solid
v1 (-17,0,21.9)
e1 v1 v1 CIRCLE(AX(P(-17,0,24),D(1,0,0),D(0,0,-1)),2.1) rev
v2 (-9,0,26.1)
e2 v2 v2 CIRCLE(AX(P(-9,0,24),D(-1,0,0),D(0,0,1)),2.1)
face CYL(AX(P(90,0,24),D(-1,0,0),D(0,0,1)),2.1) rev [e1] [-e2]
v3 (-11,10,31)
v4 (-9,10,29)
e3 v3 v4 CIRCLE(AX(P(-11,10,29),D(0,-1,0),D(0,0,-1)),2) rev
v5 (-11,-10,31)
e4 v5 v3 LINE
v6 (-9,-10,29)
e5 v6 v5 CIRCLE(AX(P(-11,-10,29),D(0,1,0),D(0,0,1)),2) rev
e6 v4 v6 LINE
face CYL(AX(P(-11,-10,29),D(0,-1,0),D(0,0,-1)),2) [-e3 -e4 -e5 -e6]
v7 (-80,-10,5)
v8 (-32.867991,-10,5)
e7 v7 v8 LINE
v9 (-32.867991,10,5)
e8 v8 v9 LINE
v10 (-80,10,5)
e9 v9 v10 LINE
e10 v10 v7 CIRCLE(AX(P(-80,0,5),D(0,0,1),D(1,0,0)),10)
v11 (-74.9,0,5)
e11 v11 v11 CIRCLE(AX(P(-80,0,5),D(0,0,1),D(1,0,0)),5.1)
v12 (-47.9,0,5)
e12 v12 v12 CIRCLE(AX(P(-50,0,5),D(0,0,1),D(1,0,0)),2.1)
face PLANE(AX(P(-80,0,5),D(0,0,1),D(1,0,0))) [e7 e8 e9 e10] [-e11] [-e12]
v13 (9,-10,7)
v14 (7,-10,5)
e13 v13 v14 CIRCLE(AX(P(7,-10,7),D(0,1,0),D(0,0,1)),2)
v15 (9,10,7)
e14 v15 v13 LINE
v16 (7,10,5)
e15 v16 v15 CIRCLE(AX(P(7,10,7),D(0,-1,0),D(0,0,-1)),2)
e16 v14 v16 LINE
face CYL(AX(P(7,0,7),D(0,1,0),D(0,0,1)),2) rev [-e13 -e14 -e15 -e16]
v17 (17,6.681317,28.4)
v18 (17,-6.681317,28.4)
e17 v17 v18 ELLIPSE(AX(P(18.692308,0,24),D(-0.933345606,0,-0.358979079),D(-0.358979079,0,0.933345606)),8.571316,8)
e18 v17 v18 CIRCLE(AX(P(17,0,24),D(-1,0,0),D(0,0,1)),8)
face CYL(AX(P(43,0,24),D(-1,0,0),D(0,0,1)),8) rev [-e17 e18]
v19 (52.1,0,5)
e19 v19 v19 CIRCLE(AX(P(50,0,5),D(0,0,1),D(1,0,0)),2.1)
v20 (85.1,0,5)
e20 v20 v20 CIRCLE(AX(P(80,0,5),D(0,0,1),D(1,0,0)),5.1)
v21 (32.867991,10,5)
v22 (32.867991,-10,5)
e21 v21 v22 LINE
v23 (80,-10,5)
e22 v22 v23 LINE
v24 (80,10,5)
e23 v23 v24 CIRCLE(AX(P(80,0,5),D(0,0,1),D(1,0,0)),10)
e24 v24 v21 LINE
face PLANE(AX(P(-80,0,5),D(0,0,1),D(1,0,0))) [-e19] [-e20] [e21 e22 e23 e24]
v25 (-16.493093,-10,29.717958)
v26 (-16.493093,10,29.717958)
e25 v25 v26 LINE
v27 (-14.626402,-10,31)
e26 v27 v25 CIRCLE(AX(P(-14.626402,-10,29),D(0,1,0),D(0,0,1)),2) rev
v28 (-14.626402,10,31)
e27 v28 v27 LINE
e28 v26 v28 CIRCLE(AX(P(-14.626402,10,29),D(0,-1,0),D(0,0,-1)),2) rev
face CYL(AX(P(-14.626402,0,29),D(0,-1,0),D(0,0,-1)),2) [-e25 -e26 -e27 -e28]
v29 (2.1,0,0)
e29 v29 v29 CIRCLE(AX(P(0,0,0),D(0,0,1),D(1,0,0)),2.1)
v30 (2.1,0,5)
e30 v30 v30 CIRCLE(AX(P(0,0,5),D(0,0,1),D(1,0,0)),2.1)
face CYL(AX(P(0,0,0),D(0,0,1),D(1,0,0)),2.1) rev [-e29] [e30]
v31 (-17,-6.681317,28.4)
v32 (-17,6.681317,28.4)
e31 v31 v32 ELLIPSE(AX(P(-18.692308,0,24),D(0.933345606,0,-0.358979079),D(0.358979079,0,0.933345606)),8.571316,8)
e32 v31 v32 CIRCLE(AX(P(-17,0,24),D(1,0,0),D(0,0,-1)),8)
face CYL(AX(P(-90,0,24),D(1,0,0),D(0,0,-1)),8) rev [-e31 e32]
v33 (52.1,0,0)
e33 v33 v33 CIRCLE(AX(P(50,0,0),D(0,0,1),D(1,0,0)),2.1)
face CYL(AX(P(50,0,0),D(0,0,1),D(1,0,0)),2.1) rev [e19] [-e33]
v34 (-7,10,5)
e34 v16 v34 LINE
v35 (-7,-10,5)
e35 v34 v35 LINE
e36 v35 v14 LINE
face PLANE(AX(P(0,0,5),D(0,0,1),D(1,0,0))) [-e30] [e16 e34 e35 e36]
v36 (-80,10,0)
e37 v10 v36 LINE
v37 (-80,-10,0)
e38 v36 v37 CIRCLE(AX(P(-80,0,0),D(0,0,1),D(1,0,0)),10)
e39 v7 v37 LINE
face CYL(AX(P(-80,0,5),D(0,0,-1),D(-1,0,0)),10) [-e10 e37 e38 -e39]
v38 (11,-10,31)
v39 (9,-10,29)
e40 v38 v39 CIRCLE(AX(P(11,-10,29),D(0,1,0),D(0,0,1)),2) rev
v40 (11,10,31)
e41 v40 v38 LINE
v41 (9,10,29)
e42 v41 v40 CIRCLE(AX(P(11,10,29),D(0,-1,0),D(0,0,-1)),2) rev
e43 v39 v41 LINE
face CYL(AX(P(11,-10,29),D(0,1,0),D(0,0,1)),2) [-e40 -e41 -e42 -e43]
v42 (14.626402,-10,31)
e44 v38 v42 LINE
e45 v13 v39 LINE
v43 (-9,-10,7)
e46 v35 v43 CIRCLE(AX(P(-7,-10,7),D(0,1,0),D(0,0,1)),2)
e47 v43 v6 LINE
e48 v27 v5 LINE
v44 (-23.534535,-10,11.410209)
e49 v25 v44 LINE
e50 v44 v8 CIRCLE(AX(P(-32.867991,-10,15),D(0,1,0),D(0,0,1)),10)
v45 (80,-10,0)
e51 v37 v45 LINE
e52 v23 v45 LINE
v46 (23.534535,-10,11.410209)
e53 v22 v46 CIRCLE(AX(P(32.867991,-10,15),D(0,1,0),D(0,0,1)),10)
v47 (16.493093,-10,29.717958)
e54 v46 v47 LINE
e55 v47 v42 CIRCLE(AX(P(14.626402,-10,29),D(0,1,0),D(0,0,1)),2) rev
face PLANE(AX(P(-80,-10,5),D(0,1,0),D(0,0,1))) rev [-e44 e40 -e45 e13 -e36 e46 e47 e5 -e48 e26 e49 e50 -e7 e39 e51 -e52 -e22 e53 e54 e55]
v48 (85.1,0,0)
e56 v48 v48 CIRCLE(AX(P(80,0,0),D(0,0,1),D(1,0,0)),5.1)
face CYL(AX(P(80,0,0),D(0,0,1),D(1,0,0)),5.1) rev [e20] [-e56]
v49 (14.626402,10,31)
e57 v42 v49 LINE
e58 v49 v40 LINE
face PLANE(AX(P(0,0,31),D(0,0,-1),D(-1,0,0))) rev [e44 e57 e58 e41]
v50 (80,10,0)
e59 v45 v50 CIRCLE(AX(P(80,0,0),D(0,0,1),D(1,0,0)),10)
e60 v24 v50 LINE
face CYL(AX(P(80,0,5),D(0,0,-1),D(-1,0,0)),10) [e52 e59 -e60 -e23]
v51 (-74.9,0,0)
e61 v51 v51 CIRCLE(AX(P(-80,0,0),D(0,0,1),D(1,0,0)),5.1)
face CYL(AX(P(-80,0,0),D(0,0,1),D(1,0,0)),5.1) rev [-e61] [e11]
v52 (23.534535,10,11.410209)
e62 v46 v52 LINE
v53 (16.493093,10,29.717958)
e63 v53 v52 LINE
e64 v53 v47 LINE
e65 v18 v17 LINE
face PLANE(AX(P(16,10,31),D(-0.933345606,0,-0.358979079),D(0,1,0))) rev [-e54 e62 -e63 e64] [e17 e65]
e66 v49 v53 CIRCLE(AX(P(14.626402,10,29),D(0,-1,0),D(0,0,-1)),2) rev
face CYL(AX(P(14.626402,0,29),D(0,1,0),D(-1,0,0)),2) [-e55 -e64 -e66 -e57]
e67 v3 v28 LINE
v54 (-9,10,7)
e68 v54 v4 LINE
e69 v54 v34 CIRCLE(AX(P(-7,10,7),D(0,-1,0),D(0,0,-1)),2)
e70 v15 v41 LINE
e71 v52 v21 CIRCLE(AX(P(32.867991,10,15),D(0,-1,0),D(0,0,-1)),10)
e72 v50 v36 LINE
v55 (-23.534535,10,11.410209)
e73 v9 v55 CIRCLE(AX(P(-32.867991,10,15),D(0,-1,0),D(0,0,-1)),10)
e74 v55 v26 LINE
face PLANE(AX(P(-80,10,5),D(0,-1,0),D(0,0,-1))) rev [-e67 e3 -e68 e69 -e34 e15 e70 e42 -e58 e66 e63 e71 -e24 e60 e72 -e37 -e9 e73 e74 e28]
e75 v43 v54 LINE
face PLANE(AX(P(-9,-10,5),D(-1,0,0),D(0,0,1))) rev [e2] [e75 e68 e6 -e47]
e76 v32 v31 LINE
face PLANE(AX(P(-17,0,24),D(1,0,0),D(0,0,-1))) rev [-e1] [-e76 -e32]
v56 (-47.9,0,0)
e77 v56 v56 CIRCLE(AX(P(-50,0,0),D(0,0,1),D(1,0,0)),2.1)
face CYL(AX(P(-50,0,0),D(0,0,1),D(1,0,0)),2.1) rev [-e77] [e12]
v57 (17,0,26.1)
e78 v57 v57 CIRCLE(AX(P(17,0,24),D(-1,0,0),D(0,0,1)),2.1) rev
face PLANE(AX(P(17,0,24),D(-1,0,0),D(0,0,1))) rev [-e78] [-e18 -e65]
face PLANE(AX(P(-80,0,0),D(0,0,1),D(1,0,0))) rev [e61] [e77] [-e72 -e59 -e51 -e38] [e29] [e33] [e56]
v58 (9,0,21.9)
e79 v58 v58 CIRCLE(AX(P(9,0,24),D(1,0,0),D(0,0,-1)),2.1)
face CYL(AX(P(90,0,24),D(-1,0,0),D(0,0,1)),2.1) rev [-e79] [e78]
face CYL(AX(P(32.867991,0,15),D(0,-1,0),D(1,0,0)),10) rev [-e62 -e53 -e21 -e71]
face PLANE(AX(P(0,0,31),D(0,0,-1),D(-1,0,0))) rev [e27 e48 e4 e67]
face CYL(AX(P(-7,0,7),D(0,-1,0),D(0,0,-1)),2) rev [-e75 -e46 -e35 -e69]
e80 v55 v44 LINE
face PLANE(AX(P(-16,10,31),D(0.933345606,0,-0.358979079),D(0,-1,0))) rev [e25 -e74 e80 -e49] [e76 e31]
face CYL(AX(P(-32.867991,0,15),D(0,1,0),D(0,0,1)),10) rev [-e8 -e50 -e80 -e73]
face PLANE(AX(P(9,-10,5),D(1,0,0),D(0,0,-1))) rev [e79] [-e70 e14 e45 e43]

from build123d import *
from OCP.BRepFilletAPI import BRepFilletAPI_MakeChamfer

# Parameters (mm, degrees)
BOSS_EXTRU_1_DEPTH           = 5
ESQUISSE2_R                  = 5.1
ESQUISSE2_R_2                = 2.1
ENL_V_MAT_EXTRU_1_DEPTH      = 91.691785736
ESQUISSE3_W                  = 32
ESQUISSE3_H                  = 20
BOSS_EXTRU_2_DEPTH           = 26
CHANFREIN1_SIZE              = 10
CHANFREIN1_SIZE_2            = 26
CONG_1_R                     = 10
ESQUISSE4_W                  = 18
ESQUISSE4_H                  = 20
ENL_V_MAT_EXTRU_2_DEPTH      = 26
CONG_2_R                     = 2
ENL_V_MAT_EXTRU_3_DEPTH      = 105.220919205
ENL_V_MAT_EXTRU_3_DEPTH_BACK = 105.220919205
ESQUISSE5_R                  = 2.1
ENL_V_START                  = -8
ESQUISSE6_R                  = 8
ENL_V_MAT_EXTRU_4_DEPTH      = 26
ESQUISSE7_R                  = 8
ENL_V_MAT_EXTRU_5_DEPTH      = 97.220919205
CONG_3_START                 = -11
CONG_3_DEPTH                 = 22
SKETCH1_R                    = 2.1
CUT_EXTRUDE1_DEPTH           = 95.212525707


with BuildPart() as part:
    # Esquisse1 → Boss.-Extru.1 (new body)
    with BuildSketch(Plane.XY):
        with BuildLine():
            Line((-80, 10), (80, 10))
            ThreePointArc((80, 10), (90, 0), (80, -10))
            Line((80, -10), (-80, -10))
            ThreePointArc((-80, -10), (-90, 0), (-80, 10))
        make_face()
    extrude(amount=BOSS_EXTRU_1_DEPTH)

    # Esquisse2 → Enlèv. mat.-Extru.1 (cut, through all)
    with BuildSketch(Plane.XY.offset(5)):
        with Locations((-80, 0)):
            Circle(ESQUISSE2_R)
        with Locations((80, 0)):
            Circle(ESQUISSE2_R)
        with Locations((-50, 0)):
            Circle(ESQUISSE2_R_2)
        with Locations((50, 0)):
            Circle(ESQUISSE2_R_2)
    extrude(amount=-ENL_V_MAT_EXTRU_1_DEPTH, mode=Mode.SUBTRACT)

    # Esquisse3 → Boss.-Extru.2 (add)
    with BuildSketch(Plane.XY.offset(5)):
        Rectangle(ESQUISSE3_W, ESQUISSE3_H)
    extrude(amount=BOSS_EXTRU_2_DEPTH)

    # Chanfrein1
    chanfrein1_edges_1 = [part.edges().sort_by_distance(p)[0] for p in [
        (16, 0, 5),
    ]]
    chanfrein1_side_1 = [part.faces().sort_by_distance(p)[0] for p in [
        (16.2, 0, 5),
    ]]
    chanfrein1_edges_2 = [part.edges().sort_by_distance(p)[0] for p in [
        (-16, 0, 5),
    ]]
    chanfrein1_side_2 = [part.faces().sort_by_distance(p)[0] for p in [
        (-16.2, 0, 5),
    ]]
    chanfrein1 = BRepFilletAPI_MakeChamfer(part.part.solid().wrapped)
    for e in chanfrein1_edges_1:
        chanfrein1.Add(CHANFREIN1_SIZE - 0.0001, CHANFREIN1_SIZE_2 - 0.0001, e.wrapped, chanfrein1_side_1[0].wrapped)
    for e in chanfrein1_edges_2:
        chanfrein1.Add(CHANFREIN1_SIZE - 0.0001, CHANFREIN1_SIZE_2 - 0.0001, e.wrapped, chanfrein1_side_2[0].wrapped)
    add(Compound.cast(chanfrein1.Shape()), mode=Mode.REPLACE)  # a hair under: the kernel refuses the full size

    # Congé1
    cong_1_edges = [part.edges().sort_by_distance(p)[0] for p in [
        (25.9999, 0, 5),
        (-25.9999, 0, 5),
    ]]
    fillet(cong_1_edges, radius=CONG_1_R)

    # Esquisse4 → Enlèv. mat.-Extru.2 (cut)
    with BuildSketch(Plane.XY.offset(31)):
        Rectangle(ESQUISSE4_W, ESQUISSE4_H)
    extrude(amount=-ENL_V_MAT_EXTRU_2_DEPTH, mode=Mode.SUBTRACT)

    # Congé2
    cong_2_edges = [part.edges().sort_by_distance(p)[0] for p in [
        (9, 0, 5),
        (-9, 0, 5),
    ]]
    fillet(cong_2_edges, radius=CONG_2_R)

    # Esquisse5 → Enlèv. mat.-Extru.3 (cut, two sides: drawn at the far end of the back side and taken through both)
    with BuildSketch(Plane.ZY.offset(-9).offset(-ENL_V_MAT_EXTRU_3_DEPTH_BACK)):
        with Locations((24, 0)):
            Circle(ESQUISSE5_R)
    extrude(amount=ENL_V_MAT_EXTRU_3_DEPTH + ENL_V_MAT_EXTRU_3_DEPTH_BACK, mode=Mode.SUBTRACT)

    # Esquisse6 → Enlèv. mat.-Extru.4 (cut)
    with BuildSketch(Plane.ZY.offset(-9).offset(ENL_V_START)):
        with Locations((24, 0)):
            Circle(ESQUISSE6_R)
    extrude(amount=-ENL_V_MAT_EXTRU_4_DEPTH, mode=Mode.SUBTRACT)

    # Esquisse7 → Enlèv. mat.-Extru.5 (cut, through all)
    with BuildSketch(Plane(origin=(-9, 0, 0), x_dir=(0, 0, -1), z_dir=(1, 0, 0)).offset(ENL_V_START)):
        with Locations((-24, 0)):
            Circle(ESQUISSE7_R)
    extrude(amount=-ENL_V_MAT_EXTRU_5_DEPTH, mode=Mode.SUBTRACT)

    # Congé3: read off the stored shape, not the designer's step
    # Congé3 outline → Congé3 (cut)
    with BuildSketch(Plane(origin=(0, 0, 0), x_dir=(1, 0, 0), z_dir=(0, 1, 0)).offset(CONG_3_START)):
        with BuildLine():
            Line((-9, -31), (-9, -29))
            ThreePointArc((-9, -29), (-9.585786438, -30.414213562), (-11, -31))
            Line((-11, -31), (-9, -31))
        make_face()
        with BuildLine():
            Line((-16, -31), (-14.626401804, -31))
            ThreePointArc((-14.626401804, -31), (-15.758674669, -30.64862311), (-16.493093016, -29.717958159))
            Line((-16.493093016, -29.717958159), (-16, -31))
        make_face()
        with BuildLine():
            ThreePointArc((16.493093016, -29.717958159), (15.758674669, -30.64862311), (14.626401804, -31))
            Line((14.626401804, -31), (16, -31))
            Line((16, -31), (16.493093016, -29.717958159))
        make_face()
        with BuildLine():
            ThreePointArc((11, -31), (9.585786438, -30.414213562), (9, -29))
            Line((9, -29), (9, -31))
            Line((9, -31), (11, -31))
        make_face()
    extrude(amount=CONG_3_DEPTH, mode=Mode.SUBTRACT)

    # Sketch1 → Cut-Extrude1 (cut, through all)
    with BuildSketch(Plane.XY.offset(5)):
        Circle(SKETCH1_R)
    extrude(amount=-CUT_EXTRUDE1_DEPTH, mode=Mode.SUBTRACT)


solid = part.part
